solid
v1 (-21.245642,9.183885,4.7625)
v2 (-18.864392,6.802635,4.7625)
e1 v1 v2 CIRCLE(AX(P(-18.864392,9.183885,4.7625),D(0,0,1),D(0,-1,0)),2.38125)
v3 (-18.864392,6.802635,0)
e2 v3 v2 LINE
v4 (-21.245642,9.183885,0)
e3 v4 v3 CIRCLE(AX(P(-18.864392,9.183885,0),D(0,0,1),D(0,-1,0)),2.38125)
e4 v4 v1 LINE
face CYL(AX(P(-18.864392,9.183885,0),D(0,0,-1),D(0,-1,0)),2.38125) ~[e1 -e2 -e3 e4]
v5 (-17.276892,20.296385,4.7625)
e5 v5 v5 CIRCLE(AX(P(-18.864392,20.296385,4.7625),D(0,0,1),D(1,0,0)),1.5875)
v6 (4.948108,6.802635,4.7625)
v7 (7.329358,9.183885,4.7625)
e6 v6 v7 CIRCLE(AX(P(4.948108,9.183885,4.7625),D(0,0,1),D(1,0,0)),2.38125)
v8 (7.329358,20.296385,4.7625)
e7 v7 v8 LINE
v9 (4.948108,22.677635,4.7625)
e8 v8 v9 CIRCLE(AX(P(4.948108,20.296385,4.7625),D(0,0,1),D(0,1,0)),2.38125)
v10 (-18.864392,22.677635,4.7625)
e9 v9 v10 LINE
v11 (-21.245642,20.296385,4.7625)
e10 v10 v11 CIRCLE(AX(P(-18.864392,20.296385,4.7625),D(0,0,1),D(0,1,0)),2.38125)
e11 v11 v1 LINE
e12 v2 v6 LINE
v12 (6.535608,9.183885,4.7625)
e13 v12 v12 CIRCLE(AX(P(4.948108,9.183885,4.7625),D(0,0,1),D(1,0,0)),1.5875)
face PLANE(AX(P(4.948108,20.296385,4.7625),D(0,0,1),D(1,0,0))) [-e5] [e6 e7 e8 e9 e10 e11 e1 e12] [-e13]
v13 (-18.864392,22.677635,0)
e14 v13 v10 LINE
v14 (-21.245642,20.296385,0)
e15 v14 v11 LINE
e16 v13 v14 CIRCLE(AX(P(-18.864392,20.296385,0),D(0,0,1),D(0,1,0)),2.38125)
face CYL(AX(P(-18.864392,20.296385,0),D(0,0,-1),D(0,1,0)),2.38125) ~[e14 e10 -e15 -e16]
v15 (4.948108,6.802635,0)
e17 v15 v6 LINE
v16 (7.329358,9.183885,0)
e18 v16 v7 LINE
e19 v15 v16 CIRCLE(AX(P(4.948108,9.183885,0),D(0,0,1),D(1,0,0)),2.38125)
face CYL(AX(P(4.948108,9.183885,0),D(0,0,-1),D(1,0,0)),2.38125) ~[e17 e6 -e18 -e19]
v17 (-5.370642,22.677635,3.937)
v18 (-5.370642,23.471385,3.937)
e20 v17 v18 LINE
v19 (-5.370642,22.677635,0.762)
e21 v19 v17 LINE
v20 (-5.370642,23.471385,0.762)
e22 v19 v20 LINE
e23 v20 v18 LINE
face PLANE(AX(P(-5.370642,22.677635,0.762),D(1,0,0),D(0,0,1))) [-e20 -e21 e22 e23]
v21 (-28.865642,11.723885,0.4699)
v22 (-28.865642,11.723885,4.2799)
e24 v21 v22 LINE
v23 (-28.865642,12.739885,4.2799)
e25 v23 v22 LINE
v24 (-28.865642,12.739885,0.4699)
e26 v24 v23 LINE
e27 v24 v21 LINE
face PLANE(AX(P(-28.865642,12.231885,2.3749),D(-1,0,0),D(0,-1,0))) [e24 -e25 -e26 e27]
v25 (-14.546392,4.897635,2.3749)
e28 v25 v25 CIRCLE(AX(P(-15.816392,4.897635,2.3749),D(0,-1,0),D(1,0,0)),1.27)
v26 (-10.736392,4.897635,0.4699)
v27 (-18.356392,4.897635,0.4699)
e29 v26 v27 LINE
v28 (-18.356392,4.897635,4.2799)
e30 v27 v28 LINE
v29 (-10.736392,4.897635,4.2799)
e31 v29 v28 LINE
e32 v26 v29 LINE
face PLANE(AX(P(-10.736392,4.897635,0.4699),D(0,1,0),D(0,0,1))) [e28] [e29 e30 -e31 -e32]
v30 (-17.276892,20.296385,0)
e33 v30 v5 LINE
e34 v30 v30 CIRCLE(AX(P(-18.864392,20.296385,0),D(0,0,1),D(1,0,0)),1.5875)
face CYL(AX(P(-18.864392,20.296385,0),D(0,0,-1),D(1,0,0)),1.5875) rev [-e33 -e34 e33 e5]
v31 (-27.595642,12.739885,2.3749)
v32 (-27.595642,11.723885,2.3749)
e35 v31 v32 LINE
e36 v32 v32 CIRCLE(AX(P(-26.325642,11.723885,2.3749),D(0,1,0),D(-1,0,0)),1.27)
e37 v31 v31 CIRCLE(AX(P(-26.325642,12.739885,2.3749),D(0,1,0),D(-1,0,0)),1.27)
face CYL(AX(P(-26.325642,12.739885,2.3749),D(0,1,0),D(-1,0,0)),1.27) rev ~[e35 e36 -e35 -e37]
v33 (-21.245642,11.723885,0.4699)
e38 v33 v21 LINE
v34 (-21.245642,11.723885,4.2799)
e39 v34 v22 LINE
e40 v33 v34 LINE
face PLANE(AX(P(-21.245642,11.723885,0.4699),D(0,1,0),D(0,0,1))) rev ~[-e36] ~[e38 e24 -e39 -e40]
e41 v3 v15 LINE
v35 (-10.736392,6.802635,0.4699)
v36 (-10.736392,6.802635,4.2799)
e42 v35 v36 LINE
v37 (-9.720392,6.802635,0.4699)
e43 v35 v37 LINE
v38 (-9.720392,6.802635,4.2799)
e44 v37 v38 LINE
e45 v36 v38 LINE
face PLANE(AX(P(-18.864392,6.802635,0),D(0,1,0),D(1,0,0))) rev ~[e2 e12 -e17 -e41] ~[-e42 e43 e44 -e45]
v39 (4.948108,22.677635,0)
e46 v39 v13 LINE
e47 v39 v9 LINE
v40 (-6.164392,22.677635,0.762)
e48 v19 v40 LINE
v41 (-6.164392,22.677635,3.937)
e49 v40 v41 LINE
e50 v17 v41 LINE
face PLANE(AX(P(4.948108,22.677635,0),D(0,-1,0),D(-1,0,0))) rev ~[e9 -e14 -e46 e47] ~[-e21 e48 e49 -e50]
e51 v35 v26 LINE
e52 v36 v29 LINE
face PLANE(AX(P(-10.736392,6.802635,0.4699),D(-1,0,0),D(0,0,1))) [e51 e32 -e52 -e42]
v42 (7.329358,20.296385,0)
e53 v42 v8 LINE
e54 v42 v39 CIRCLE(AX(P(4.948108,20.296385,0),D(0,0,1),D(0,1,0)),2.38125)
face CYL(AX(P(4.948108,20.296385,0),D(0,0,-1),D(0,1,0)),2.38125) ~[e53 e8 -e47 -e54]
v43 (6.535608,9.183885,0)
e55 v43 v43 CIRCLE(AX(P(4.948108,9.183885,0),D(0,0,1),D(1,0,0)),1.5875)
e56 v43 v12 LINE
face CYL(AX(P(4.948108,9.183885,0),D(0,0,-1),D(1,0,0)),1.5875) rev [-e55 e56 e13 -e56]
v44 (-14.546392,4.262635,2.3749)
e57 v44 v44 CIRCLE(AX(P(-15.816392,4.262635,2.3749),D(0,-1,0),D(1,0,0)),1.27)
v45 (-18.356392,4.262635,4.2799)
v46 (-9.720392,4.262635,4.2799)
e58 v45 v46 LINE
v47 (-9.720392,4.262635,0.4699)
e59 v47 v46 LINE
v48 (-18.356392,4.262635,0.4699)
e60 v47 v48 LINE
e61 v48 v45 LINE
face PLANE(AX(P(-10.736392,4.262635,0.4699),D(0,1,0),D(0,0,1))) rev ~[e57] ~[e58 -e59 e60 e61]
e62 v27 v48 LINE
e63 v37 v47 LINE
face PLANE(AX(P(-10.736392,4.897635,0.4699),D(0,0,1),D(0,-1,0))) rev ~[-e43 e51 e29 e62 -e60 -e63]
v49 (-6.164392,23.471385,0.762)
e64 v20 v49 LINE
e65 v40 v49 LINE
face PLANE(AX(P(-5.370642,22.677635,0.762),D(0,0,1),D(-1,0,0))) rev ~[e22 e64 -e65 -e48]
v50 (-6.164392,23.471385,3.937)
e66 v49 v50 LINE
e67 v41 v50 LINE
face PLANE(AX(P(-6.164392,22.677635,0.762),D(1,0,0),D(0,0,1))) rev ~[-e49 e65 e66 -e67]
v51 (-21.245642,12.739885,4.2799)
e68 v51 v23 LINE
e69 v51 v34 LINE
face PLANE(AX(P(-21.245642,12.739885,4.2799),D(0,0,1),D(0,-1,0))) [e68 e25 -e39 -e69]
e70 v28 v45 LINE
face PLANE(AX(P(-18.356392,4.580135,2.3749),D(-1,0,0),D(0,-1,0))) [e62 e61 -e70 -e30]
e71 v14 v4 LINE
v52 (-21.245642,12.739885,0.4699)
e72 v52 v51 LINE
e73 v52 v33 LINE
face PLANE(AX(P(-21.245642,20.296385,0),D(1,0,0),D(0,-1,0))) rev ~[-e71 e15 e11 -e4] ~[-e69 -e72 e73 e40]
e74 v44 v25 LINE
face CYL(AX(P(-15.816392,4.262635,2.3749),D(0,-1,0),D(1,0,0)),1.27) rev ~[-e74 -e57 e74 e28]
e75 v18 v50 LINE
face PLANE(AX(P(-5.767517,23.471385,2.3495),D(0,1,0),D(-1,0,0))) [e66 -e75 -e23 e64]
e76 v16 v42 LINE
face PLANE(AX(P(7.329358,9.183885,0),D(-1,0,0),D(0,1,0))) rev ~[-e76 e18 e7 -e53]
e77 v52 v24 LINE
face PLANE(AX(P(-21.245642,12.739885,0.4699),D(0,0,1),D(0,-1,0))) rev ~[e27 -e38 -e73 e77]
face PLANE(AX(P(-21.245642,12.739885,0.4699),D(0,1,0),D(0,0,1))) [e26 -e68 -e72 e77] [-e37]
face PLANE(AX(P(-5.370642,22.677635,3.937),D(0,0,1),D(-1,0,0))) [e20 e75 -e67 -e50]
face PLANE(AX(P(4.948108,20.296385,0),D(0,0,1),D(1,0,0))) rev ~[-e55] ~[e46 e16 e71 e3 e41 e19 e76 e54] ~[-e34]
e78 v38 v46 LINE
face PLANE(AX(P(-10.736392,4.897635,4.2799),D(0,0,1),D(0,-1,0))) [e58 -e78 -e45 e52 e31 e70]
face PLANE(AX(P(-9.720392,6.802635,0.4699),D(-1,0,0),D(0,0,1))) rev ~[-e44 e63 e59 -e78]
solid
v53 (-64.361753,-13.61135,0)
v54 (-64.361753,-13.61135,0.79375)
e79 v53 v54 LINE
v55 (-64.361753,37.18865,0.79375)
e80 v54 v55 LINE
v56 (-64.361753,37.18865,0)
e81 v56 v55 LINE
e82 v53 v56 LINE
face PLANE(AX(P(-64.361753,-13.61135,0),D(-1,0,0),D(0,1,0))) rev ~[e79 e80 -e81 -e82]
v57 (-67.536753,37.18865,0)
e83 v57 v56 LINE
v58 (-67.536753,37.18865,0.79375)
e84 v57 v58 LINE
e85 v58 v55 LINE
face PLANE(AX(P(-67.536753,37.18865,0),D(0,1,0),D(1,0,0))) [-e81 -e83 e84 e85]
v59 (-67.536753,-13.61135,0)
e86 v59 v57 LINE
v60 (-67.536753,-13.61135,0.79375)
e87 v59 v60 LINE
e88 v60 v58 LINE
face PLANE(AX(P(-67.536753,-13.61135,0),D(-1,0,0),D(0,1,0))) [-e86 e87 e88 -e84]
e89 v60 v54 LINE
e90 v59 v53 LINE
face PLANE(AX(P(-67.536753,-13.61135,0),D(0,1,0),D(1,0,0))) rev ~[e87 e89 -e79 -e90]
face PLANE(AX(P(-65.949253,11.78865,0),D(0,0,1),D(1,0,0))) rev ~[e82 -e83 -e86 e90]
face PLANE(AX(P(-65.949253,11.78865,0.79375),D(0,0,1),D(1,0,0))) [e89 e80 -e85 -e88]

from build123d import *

# Parameters (mm, degrees)
F0_R      = 1.5875
F1_DEPTH  = 4.7625
F2_W      = 3.175
F2_H      = 50.8
F3_DEPTH  = 0.79375
F4_W      = 0.79375
F4_H      = 3.175
F5_DEPTH  = 0.79375
F6_W      = 1.016
F6_H      = 3.81
F7_DEPTH  = 2.54
F8_W      = 0.635
F8_H      = 3.81
F9_DEPTH  = 7.62
F10_R     = 1.27
F11_DEPTH = 1.16693
F12_W     = 1.016
F12_H     = 3.81
F13_DEPTH = 7.62
F14_R     = 1.27
F15_DEPTH = 25.4


# Not quite as in the source:
# - a length typed as a fraction of an inch, garbled in the dataset ("3 / 203.2 mm" for 3/8 in), is restored


with BuildPart() as f1:
    # F0 (on Top) → F1 (new body)
    with BuildSketch(Plane.XY):
        with BuildLine():
            ThreePointArc((7.3293575469, 20.2963850541), (6.6319055696, 21.9801830768), (4.9481075469, 22.6776350541))
            ThreePointArc((4.9481075469, 22.6776350541), (3.2643095242, 18.6125870314), (7.3293575469, 20.2963850541))
        make_face()
        with BuildLine():
            ThreePointArc((-16.4831424531, 9.1838850541), (-18.8643924531, 11.5651350541), (-21.2456424531, 9.1838850541))
            ThreePointArc((-21.2456424531, 9.1838850541), (-20.5481904758, 7.5000870314), (-18.8643924531, 6.8026350541))
            ThreePointArc((-18.8643924531, 6.8026350541), (-17.1805944304, 7.5000870314), (-16.4831424531, 9.1838850541))
        make_face()
        with BuildLine():
            ThreePointArc((-16.4831424531, 20.2963850541), (-17.1805944304, 21.9801830768), (-18.8643924531, 22.6776350541))
            ThreePointArc((-18.8643924531, 22.6776350541), (-20.5481904758, 21.9801830768), (-21.2456424531, 20.2963850541))
            ThreePointArc((-21.2456424531, 20.2963850541), (-18.8643924531, 17.9151350541), (-16.4831424531, 20.2963850541))
        make_face()
        with Locations((-18.8643924531, 20.2963850541)):
            Circle(F0_R, mode=Mode.SUBTRACT)
        with BuildLine():
            ThreePointArc((4.9481075338, 6.8026350541), (6.631905565, 7.5000870268), (7.3293575469, 9.1838850541))
            ThreePointArc((7.3293575469, 9.1838850541), (3.2643095288, 10.8676830814), (4.9481075338, 6.8026350541))
        make_face()
        with Locations((4.9481075469, 9.1838850541)):
            Circle(F0_R, mode=Mode.SUBTRACT)
        with BuildLine():
            Line((4.9481075469, 22.6776350541), (-18.8643924531, 22.6776350541))
            ThreePointArc((-18.8643924531, 22.6776350541), (-17.1805944304, 21.9801830768), (-16.4831424531, 20.2963850541))
            ThreePointArc((-16.4831424531, 20.2963850541), (-18.8643924531, 17.9151350541), (-21.2456424531, 20.2963850541))
            Line((-21.2456424531, 20.2963850541), (-21.2456424531, 9.1838850541))
            ThreePointArc((-21.2456424531, 9.1838850541), (-18.8643924531, 11.5651350541), (-16.4831424531, 9.1838850541))
            ThreePointArc((-16.4831424531, 9.1838850541), (-17.1805944304, 7.5000870314), (-18.8643924531, 6.8026350541))
            Line((-18.8643924531, 6.8026350541), (4.9481075338, 6.8026350541))
            ThreePointArc((4.9481075338, 6.8026350541), (3.2643095288, 10.8676830814), (7.3293575469, 9.1838850541))
            Line((7.3293575469, 9.1838850541), (7.3293575469, 20.2963850541))
            ThreePointArc((7.3293575469, 20.2963850541), (3.2643095242, 18.6125870314), (4.9481075469, 22.6776350541))
        make_face()
    extrude(amount=F1_DEPTH)

    # F4 (on face) → F5 (join)
    with BuildSketch(Plane(origin=(0, 22.6776350541, 0), x_dir=(-1, 0, 0), z_dir=(0, 1, 0))):
        with Locations((5.7675174531, 2.3495)):
            Rectangle(F4_W, F4_H)
    extrude(amount=F5_DEPTH)

    # F6 (on face) → F7 (join)
    with BuildSketch(Plane.XZ.offset(-6.8026350541)):
        with Locations((-10.2283924531, 2.3749)):
            Rectangle(F6_W, F6_H)
    extrude(amount=F7_DEPTH)

    # F8 (on face) → F9 (join)
    with BuildSketch(Plane(origin=(-10.7363924531, 0, 0), x_dir=(0, -1, 0), z_dir=(-1, 0, 0))):
        with Locations((-4.5801350541, 2.3749)):
            Rectangle(F8_W, F8_H)
    extrude(amount=F9_DEPTH)

    # F10 (on face) → F11 (cut)
    with BuildSketch(Plane.XZ.offset(-4.2626350541)):
        with Locations((-15.8163924531, 2.3749)):
            Circle(F10_R)
    extrude(amount=-F11_DEPTH, mode=Mode.SUBTRACT)

    # F12 (on face) → F13 (join)
    with BuildSketch(Plane(origin=(-21.2456424531, 0, 0), x_dir=(0, -1, 0), z_dir=(-1, 0, 0))):
        with Locations((-12.2318850541, 2.3749)):
            Rectangle(F12_W, F12_H)
    extrude(amount=F13_DEPTH)

    # F14 (on face) → F15 (cut)
    with BuildSketch(Plane(origin=(0, 12.7398850541, 0), x_dir=(-1, 0, 0), z_dir=(0, 1, 0))):
        with Locations((26.3256424531, 2.3749)):
            Circle(F14_R)
    extrude(amount=-F15_DEPTH, mode=Mode.SUBTRACT)


with BuildPart() as f3:
    # F2 (on Top) → F3 (new body)
    with BuildSketch(Plane.XY):
        with Locations((-65.9492532059, 11.7886504158)):
            Rectangle(F2_W, F2_H)
    extrude(amount=F3_DEPTH)


solid = Compound([f1.part, f3.part])
